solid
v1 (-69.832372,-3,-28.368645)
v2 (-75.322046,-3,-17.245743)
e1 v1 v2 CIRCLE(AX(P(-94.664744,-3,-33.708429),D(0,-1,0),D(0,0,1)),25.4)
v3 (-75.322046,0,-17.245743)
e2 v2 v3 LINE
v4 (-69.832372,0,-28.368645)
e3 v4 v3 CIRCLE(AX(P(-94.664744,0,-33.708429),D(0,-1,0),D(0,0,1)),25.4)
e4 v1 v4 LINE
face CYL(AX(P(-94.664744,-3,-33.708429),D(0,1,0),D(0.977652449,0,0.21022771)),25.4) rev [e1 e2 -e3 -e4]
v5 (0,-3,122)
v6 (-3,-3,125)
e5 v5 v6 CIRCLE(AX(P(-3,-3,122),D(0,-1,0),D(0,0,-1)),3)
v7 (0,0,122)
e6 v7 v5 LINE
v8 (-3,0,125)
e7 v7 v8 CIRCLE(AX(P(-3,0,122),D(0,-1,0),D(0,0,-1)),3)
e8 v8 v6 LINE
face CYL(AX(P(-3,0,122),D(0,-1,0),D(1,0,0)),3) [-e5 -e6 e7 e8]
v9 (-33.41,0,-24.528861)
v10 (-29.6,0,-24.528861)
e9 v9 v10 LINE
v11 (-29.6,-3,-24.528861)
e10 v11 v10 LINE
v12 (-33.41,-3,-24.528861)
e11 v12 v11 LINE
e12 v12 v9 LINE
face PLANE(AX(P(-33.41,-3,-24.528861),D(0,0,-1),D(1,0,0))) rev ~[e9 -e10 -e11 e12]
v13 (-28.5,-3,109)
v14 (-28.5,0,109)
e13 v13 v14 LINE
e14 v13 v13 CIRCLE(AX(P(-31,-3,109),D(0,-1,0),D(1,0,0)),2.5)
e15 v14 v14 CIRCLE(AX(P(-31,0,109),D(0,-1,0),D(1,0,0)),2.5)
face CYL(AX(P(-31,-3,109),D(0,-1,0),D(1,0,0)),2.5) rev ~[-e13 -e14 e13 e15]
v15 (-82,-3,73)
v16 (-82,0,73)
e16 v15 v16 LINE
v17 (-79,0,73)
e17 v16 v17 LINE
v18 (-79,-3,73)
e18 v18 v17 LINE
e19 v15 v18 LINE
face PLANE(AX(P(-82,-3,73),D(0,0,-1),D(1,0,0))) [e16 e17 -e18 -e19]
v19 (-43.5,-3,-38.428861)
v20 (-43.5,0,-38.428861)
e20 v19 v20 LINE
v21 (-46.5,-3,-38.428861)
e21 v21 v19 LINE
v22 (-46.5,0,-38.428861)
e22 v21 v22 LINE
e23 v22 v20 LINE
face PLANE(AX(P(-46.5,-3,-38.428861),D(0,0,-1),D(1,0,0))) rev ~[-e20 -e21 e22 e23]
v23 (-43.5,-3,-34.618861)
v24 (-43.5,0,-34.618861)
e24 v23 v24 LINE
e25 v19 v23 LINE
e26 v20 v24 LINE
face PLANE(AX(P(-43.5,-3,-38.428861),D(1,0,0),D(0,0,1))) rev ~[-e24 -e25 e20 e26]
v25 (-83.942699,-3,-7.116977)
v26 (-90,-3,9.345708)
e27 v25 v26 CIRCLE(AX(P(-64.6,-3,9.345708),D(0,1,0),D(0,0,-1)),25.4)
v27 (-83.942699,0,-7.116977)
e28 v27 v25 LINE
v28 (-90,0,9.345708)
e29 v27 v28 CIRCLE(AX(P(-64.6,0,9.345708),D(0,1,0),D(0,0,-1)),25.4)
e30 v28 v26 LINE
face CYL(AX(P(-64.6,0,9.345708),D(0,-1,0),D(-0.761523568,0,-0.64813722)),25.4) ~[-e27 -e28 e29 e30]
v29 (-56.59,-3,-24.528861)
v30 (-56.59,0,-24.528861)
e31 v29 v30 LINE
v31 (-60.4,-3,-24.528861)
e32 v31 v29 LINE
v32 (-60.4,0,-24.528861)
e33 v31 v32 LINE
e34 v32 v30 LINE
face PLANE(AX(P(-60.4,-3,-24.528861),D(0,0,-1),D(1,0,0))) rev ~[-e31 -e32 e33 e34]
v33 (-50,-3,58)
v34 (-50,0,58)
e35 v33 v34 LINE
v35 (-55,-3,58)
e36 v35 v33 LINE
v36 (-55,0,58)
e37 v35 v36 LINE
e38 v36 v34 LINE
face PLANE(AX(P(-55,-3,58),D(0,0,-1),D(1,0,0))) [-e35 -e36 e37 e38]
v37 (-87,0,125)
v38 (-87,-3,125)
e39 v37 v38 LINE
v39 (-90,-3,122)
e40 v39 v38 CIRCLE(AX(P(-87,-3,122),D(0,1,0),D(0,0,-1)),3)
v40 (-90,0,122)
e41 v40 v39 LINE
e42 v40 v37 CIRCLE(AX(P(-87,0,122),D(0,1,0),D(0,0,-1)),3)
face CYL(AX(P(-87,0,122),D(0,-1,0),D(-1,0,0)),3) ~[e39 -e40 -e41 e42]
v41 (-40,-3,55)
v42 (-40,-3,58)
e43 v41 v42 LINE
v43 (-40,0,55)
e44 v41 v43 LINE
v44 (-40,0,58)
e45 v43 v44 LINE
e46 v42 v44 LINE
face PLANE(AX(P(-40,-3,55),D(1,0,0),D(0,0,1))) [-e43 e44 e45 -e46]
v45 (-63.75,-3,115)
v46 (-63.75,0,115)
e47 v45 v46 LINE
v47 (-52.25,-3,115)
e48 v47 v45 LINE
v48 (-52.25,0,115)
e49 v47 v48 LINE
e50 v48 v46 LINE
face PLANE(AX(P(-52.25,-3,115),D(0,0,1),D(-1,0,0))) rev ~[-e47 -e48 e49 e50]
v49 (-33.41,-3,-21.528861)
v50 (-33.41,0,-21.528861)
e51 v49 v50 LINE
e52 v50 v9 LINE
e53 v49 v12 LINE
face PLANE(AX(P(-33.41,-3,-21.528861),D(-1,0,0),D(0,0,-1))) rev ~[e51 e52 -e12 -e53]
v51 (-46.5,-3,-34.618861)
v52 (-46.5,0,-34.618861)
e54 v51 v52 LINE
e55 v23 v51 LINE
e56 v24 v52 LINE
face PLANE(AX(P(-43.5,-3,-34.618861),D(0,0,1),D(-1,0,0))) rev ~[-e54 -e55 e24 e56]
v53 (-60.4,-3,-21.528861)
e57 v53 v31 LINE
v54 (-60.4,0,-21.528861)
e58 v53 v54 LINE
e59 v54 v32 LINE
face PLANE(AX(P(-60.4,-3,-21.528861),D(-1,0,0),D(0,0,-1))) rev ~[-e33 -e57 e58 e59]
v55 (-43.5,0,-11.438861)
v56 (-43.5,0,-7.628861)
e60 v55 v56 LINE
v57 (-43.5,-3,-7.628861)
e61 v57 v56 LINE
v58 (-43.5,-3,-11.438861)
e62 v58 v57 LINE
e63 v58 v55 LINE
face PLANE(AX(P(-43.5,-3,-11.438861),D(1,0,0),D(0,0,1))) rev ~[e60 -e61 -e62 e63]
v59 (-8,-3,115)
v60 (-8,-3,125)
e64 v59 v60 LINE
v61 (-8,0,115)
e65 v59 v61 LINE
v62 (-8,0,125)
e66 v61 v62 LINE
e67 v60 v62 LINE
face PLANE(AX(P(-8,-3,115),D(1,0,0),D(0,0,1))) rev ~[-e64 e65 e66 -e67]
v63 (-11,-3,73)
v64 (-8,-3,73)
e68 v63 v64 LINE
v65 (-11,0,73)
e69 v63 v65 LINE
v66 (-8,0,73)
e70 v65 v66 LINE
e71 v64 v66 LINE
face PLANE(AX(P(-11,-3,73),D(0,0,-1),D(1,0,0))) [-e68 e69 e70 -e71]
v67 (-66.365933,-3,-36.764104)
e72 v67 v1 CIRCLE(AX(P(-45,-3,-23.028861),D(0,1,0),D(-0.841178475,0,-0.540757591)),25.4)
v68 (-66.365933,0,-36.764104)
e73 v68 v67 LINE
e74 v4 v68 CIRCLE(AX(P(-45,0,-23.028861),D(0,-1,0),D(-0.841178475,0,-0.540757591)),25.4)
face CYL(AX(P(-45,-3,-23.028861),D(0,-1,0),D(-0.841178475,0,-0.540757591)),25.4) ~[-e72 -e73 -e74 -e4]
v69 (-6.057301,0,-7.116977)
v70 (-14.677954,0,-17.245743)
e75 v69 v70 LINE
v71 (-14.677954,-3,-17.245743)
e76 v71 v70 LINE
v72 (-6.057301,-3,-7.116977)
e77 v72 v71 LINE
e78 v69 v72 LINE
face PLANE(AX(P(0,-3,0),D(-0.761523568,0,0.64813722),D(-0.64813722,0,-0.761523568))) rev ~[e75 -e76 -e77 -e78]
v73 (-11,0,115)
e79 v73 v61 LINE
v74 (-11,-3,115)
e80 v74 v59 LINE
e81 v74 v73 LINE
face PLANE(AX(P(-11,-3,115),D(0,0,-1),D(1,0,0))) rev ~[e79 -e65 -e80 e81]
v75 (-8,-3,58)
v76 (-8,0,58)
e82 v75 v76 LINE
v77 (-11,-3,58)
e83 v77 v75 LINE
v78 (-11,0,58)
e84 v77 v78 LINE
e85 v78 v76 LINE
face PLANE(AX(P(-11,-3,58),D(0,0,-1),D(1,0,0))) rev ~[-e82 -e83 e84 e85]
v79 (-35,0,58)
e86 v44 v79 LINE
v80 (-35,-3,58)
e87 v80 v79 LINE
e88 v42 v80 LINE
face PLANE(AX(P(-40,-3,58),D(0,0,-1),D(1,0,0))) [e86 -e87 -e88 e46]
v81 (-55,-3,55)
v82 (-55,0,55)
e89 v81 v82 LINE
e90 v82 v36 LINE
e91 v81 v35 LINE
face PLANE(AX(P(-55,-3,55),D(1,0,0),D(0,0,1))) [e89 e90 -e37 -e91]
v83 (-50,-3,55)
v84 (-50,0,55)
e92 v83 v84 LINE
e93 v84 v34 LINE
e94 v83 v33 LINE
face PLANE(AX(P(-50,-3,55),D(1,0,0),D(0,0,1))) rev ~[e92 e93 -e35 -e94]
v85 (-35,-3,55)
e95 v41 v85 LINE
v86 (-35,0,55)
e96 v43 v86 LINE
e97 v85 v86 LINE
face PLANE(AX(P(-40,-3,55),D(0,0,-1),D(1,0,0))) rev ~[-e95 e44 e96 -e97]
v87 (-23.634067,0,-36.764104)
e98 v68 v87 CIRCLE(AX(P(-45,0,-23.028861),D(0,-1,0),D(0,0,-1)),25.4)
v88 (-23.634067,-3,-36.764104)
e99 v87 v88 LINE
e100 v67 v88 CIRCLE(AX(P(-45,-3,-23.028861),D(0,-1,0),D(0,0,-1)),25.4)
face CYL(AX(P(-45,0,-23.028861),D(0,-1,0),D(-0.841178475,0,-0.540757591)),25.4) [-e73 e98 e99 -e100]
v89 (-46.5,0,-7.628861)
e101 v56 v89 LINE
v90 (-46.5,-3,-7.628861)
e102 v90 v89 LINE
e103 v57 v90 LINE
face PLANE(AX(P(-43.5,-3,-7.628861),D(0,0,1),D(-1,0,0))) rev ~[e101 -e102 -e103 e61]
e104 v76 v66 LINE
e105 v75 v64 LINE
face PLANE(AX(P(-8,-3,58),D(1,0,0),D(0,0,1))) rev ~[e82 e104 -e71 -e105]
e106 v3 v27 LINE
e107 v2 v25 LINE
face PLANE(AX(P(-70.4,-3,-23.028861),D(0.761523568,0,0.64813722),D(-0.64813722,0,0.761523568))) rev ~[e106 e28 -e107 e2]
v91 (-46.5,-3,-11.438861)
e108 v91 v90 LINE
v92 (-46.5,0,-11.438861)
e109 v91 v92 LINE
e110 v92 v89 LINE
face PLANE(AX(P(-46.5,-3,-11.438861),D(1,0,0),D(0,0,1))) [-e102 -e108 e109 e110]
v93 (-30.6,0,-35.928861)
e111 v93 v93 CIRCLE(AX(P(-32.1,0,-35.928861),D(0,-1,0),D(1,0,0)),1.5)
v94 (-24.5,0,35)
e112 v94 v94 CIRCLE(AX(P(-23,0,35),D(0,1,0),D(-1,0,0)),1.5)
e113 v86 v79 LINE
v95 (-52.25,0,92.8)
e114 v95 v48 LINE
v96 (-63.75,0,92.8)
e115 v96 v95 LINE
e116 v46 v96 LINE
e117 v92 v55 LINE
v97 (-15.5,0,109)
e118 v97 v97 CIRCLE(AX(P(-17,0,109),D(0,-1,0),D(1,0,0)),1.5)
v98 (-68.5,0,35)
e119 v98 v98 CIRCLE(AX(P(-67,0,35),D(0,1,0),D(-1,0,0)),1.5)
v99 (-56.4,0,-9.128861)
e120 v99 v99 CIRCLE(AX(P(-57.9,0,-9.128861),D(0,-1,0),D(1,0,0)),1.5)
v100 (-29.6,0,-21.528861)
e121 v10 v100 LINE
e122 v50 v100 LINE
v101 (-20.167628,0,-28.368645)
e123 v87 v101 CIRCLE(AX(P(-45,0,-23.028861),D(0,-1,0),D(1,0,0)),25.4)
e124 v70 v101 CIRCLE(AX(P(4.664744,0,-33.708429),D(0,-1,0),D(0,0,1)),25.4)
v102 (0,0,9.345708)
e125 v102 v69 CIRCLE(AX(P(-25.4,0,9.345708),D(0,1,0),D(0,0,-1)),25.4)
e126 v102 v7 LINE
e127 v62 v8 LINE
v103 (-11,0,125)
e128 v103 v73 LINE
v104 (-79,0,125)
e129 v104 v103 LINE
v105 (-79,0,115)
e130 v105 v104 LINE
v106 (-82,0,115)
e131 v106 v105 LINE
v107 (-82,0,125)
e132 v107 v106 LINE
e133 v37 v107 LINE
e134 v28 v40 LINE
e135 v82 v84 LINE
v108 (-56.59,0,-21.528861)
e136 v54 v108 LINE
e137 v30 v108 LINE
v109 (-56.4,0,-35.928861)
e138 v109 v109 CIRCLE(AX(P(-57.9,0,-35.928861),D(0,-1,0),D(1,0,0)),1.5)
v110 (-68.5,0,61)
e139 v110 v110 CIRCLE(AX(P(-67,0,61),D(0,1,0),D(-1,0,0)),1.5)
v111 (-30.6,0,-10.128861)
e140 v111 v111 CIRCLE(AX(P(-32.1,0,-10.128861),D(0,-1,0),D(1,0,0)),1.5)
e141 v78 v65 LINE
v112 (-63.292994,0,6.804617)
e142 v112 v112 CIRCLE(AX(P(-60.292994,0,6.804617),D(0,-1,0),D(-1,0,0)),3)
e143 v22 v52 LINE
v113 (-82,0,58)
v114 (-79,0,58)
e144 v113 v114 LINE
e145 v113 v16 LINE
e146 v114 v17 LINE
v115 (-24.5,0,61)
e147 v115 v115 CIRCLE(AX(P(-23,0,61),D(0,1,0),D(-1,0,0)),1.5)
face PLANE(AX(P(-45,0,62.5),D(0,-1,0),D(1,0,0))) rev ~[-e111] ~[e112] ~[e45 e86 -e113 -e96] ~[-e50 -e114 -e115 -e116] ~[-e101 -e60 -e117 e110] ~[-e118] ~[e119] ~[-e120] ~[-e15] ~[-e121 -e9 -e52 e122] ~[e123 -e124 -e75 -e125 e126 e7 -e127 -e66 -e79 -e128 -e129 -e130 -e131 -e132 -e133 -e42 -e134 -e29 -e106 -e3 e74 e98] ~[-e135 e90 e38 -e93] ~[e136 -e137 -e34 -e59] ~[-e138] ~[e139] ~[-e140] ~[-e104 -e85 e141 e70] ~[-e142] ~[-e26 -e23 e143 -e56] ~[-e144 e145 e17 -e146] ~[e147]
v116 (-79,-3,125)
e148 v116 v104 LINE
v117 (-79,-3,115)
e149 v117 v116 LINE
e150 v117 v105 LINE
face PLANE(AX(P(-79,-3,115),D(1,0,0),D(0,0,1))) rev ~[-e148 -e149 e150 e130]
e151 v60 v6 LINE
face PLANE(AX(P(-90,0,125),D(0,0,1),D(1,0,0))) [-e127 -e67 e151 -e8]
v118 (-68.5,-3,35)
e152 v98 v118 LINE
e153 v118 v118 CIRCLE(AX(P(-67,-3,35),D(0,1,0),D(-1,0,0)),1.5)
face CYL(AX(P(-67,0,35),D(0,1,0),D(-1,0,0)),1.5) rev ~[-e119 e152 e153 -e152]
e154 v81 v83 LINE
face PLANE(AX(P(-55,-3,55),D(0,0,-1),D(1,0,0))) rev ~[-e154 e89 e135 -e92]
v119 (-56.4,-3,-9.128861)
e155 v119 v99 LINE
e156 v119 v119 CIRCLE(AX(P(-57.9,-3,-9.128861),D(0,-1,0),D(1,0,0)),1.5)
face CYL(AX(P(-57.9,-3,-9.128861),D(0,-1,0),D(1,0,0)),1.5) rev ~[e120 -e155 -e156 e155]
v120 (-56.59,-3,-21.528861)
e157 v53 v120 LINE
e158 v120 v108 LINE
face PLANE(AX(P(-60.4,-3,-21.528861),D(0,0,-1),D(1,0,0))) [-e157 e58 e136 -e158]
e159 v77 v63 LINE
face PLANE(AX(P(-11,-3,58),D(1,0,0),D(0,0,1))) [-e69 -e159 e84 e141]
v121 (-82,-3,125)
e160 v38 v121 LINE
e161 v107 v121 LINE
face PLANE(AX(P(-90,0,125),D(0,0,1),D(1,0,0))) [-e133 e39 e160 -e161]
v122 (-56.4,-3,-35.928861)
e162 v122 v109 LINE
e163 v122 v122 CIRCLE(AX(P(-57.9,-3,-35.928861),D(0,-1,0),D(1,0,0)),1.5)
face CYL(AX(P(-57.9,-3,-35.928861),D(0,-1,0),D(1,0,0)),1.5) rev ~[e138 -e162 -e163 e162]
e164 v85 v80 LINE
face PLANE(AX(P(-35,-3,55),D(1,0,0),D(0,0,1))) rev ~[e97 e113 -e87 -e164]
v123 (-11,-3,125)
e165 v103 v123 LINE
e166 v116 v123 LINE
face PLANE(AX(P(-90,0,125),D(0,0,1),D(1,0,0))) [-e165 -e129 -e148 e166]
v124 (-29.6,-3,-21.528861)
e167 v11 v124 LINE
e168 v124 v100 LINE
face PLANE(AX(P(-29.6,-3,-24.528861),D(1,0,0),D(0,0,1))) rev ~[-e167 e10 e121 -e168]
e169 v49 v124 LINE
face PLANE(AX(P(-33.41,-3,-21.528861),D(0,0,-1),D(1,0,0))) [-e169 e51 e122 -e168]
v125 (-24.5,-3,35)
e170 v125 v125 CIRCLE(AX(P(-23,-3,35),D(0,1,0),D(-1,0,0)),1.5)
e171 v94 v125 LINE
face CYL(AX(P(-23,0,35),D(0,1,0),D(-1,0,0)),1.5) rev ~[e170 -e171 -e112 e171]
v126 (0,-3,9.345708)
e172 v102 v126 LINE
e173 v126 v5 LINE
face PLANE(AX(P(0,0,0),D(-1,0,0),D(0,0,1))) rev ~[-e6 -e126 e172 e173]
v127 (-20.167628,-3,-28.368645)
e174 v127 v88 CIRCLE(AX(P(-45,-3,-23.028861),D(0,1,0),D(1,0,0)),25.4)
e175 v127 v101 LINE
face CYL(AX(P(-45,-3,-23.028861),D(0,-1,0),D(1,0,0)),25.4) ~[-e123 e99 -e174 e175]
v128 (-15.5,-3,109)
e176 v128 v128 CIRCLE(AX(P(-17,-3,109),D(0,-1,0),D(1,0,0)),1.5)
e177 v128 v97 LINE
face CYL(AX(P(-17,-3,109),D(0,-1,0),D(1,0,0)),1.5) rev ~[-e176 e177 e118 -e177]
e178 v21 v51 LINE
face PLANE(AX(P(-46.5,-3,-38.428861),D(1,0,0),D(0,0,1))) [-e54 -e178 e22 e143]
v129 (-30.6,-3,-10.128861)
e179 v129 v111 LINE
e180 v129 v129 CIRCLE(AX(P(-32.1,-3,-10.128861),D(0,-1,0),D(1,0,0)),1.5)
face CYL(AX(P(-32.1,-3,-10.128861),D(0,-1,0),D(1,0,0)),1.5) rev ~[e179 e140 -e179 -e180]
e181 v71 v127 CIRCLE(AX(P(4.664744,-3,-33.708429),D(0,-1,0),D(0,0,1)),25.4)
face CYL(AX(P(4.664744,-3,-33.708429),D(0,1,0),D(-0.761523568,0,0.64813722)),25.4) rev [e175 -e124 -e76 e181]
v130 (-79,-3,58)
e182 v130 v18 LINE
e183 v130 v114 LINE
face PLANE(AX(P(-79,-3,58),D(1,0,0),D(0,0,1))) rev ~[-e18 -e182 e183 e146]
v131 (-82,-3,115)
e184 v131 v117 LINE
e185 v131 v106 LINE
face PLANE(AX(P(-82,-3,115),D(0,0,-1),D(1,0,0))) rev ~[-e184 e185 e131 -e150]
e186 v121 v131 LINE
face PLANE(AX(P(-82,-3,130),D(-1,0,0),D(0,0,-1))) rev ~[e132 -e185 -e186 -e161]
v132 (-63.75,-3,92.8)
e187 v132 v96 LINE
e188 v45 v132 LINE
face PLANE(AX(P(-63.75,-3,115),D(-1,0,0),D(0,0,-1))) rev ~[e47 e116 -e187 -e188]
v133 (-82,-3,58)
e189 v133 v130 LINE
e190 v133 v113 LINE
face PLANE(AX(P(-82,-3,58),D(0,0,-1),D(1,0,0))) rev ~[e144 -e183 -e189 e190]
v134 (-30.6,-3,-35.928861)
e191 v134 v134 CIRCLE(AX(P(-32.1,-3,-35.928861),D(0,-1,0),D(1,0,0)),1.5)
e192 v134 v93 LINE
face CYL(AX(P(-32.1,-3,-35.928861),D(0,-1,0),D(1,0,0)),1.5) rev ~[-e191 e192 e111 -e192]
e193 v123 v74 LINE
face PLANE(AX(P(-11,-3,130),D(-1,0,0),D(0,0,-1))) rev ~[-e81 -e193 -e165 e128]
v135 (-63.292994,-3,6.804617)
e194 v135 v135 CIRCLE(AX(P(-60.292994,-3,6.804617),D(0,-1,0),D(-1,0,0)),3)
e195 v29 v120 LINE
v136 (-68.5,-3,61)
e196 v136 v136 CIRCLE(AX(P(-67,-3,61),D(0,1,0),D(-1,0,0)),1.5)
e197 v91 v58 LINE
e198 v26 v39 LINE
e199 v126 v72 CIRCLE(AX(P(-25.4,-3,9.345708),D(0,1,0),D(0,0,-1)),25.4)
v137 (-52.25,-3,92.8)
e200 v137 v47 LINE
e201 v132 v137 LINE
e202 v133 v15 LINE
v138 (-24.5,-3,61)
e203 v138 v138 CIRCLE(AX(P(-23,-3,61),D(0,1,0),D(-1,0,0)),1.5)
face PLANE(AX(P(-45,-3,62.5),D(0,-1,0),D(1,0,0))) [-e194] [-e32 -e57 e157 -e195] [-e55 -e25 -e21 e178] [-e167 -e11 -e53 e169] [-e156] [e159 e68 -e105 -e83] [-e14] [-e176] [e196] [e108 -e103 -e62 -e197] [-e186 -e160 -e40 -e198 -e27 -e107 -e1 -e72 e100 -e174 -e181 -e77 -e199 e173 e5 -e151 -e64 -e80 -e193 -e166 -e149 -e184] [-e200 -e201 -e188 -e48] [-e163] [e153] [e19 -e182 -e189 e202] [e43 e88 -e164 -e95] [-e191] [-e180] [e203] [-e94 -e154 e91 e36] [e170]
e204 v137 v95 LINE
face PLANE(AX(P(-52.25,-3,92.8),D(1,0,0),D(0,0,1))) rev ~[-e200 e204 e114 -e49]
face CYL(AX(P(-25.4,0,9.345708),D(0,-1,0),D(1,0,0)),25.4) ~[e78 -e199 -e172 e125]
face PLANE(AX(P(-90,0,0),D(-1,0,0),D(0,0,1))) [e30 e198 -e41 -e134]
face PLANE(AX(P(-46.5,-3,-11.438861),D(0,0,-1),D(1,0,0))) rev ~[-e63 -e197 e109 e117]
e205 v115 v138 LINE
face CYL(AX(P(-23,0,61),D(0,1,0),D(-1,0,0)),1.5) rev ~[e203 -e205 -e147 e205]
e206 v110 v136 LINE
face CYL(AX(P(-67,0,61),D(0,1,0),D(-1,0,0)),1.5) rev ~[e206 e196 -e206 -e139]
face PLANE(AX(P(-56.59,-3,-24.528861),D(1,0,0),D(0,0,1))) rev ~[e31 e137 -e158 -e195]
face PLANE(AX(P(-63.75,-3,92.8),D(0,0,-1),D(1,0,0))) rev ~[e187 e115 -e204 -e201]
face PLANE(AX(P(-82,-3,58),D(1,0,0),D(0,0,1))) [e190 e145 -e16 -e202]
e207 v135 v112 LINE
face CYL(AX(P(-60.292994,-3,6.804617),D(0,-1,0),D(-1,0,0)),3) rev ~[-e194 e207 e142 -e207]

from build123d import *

# Parameters (mm, degrees)
F0_W      = 90
F0_H      = 125
F1_DEPTH  = 3
F3_R      = 2.5
F3_R_2    = 1.5
F4_DEPTH  = 25.4
F5_R      = 25.4
F2_W      = 3
F2_H      = 5
F2_H_2    = 15
F2_H_3    = 10
F2_W_2    = 5
F2_H_4    = 3
F6_DEPTH  = 25.4
F7_W      = 3.81
F7_H      = 1.5
F7_W_2    = 1.5
F7_H_2    = 3.81
F7_R      = 1.5
F8_DEPTH  = 25.4
F9_R      = 3
F11_DEPTH = 25.4
F12_R     = 25.4
F13_R     = 1.5
F14_DEPTH = 3
F16_DEPTH = 3


# Not quite as in the source:
# - a feature names something its author has since deleted; it is built from what else it names


with BuildPart() as f1:
    # F0 (on Front) → F1 (new body)
    with BuildSketch(Plane.XZ):
        with Locations((-45, 62.5)):
            Rectangle(F0_W, F0_H)
        Polygon((-45, -70), (0, 0), (-90, 0), align=None)
    extrude(amount=F1_DEPTH)

    # F3 (on face) → F4 (cut)
    with BuildSketch(Plane.XZ.offset(3)):
        Polygon((-59, 115), (-63.75, 115), (-63.75, 109), (-58, 109), (-58, 115), align=None)
        Polygon((-58, 109), (-63.75, 109), (-63.75, 92.8), (-59, 92.8), (-58, 92.8), align=None)
        Polygon((-57, 115), (-58, 115), (-58, 109), (-52.25, 109), (-52.25, 115), align=None)
        Polygon((-52.25, 109), (-58, 109), (-58, 92.8), (-57, 92.8), (-52.25, 92.8), align=None)
        with Locations((-31, 109)):
            Circle(F3_R)
        with Locations((-17, 109)):
            Circle(F3_R_2)
    extrude(amount=-F4_DEPTH, mode=Mode.SUBTRACT)

    # F5
    f5_edges = [f1.edges().sort_by_distance(p)[0] for p in [
        (-45, -1.5, -70),
    ]]
    fillet(f5_edges, radius=F5_R)

    # F2 (on face) → F6 (cut)
    with BuildSketch(Plane.XZ.offset(3)):
        with Locations((-80.5, 127.5)):
            Rectangle(F2_W, F2_H)
        with Locations((-9.5, 127.5)):
            Rectangle(F2_W, F2_H)
        with Locations((-9.5, 65.5)):
            Rectangle(F2_W, F2_H_2)
        with Locations((-80.5, 65.5)):
            Rectangle(F2_W, F2_H_2)
        with Locations((-80.5, 120)):
            Rectangle(F2_W, F2_H_3)
        with Locations((-9.5, 120)):
            Rectangle(F2_W, F2_H_3)
        with Locations((-52.5, 56.5)):
            Rectangle(F2_W_2, F2_H_4)
        with Locations((-37.5, 56.5)):
            Rectangle(F2_W_2, F2_H_4)
    extrude(amount=-F6_DEPTH, mode=Mode.SUBTRACT)

    # F7 (on face) → F8 (cut)
    with BuildSketch(Plane.XZ.offset(3)):
        with Locations((-58.495, -22.2788609758)):
            Rectangle(F7_W, F7_H)
        with Locations((-58.495, -23.7788609758)):
            Rectangle(F7_W, F7_H)
        with Locations((-31.505, -22.2788609758)):
            Rectangle(F7_W, F7_H)
        with Locations((-31.505, -23.7788609758)):
            Rectangle(F7_W, F7_H)
        with Locations((-44.25, -36.5238609758)):
            Rectangle(F7_W_2, F7_H_2)
        with Locations((-45.75, -36.5238609758)):
            Rectangle(F7_W_2, F7_H_2)
        with Locations((-44.25, -9.5338609758)):
            Rectangle(F7_W_2, F7_H_2)
        with Locations((-45.75, -9.5338609758)):
            Rectangle(F7_W_2, F7_H_2)
        with Locations((-57.9, -9.1288609758)):
            Circle(F7_R)
        with Locations((-32.1, -10.1288609758)):
            Circle(F7_R)
        with Locations((-32.1, -35.9288609758)):
            Circle(F7_R)
        with Locations((-57.9, -35.9288609758)):
            Circle(F7_R)
    extrude(amount=-F8_DEPTH, mode=Mode.SUBTRACT)

    # F9
    f9_edges = [f1.edges().sort_by_distance(p)[0] for p in [
        (0, -1.5, 125),
        (-90, -1.5, 125),
    ]]
    fillet(f9_edges, radius=F9_R)

    # F10 (on face) → F11 (cut)
    with BuildSketch(Plane.XZ.offset(3)):
        with BuildLine():
            ThreePointArc((-66.3659332746, -36.7641037951), (-69.3706247886, -30.1865594475), (-70.4, -23.0288609758))
            Line((-70.4, -23.0288609758), (-90, 0))
            Line((-90, 0), (-66.3659332746, -36.7641037951))
        make_face()
        with BuildLine():
            Line((0, 0), (-19.6, -23.0288609758))
            ThreePointArc((-19.6, -23.0288609758), (-20.6293752114, -30.1865594475), (-23.6340667254, -36.7641037951))
            Line((-23.6340667254, -36.7641037951), (0, 0))
        make_face()
    extrude(amount=-F11_DEPTH, mode=Mode.SUBTRACT)

    # F12
    f12_edges = [f1.edges().sort_by_distance(p)[0] for p in [
        (-70.4, -1.5, -23.028861),
        (-90, -1.5, 0),
        (-19.6, -1.5, -23.028861),
        (0, -1.5, 0),
    ]]
    fillet(f12_edges, radius=F12_R)

    # F13 (on face) → F14 (cut, through all)
    with BuildSketch(Plane(origin=(0, 0, 0), x_dir=(-1, 0, 0), z_dir=(0, 1, 0))):
        with Locations((23, 61)):
            Circle(F13_R)
        with Locations((23, 35)):
            Circle(F13_R)
        with Locations((67, 35)):
            Circle(F13_R)
        with Locations((67, 61)):
            Circle(F13_R)
    extrude(amount=-F14_DEPTH, mode=Mode.SUBTRACT)

    # F15 (on face) → F16 (cut)
    with BuildSketch(Plane.XZ.offset(3)):
        with BuildLine():
            ThreePointArc((-57.2929937846, 6.804616942), (-60.2929937846, 9.804616942), (-63.2929937846, 6.804616942))
            ThreePointArc((-63.2929937846, 6.804616942), (-60.2929937846, 3.804616942), (-57.2929937846, 6.804616942))
        make_face()
    extrude(amount=-F16_DEPTH, mode=Mode.SUBTRACT)


solid = f1.part
